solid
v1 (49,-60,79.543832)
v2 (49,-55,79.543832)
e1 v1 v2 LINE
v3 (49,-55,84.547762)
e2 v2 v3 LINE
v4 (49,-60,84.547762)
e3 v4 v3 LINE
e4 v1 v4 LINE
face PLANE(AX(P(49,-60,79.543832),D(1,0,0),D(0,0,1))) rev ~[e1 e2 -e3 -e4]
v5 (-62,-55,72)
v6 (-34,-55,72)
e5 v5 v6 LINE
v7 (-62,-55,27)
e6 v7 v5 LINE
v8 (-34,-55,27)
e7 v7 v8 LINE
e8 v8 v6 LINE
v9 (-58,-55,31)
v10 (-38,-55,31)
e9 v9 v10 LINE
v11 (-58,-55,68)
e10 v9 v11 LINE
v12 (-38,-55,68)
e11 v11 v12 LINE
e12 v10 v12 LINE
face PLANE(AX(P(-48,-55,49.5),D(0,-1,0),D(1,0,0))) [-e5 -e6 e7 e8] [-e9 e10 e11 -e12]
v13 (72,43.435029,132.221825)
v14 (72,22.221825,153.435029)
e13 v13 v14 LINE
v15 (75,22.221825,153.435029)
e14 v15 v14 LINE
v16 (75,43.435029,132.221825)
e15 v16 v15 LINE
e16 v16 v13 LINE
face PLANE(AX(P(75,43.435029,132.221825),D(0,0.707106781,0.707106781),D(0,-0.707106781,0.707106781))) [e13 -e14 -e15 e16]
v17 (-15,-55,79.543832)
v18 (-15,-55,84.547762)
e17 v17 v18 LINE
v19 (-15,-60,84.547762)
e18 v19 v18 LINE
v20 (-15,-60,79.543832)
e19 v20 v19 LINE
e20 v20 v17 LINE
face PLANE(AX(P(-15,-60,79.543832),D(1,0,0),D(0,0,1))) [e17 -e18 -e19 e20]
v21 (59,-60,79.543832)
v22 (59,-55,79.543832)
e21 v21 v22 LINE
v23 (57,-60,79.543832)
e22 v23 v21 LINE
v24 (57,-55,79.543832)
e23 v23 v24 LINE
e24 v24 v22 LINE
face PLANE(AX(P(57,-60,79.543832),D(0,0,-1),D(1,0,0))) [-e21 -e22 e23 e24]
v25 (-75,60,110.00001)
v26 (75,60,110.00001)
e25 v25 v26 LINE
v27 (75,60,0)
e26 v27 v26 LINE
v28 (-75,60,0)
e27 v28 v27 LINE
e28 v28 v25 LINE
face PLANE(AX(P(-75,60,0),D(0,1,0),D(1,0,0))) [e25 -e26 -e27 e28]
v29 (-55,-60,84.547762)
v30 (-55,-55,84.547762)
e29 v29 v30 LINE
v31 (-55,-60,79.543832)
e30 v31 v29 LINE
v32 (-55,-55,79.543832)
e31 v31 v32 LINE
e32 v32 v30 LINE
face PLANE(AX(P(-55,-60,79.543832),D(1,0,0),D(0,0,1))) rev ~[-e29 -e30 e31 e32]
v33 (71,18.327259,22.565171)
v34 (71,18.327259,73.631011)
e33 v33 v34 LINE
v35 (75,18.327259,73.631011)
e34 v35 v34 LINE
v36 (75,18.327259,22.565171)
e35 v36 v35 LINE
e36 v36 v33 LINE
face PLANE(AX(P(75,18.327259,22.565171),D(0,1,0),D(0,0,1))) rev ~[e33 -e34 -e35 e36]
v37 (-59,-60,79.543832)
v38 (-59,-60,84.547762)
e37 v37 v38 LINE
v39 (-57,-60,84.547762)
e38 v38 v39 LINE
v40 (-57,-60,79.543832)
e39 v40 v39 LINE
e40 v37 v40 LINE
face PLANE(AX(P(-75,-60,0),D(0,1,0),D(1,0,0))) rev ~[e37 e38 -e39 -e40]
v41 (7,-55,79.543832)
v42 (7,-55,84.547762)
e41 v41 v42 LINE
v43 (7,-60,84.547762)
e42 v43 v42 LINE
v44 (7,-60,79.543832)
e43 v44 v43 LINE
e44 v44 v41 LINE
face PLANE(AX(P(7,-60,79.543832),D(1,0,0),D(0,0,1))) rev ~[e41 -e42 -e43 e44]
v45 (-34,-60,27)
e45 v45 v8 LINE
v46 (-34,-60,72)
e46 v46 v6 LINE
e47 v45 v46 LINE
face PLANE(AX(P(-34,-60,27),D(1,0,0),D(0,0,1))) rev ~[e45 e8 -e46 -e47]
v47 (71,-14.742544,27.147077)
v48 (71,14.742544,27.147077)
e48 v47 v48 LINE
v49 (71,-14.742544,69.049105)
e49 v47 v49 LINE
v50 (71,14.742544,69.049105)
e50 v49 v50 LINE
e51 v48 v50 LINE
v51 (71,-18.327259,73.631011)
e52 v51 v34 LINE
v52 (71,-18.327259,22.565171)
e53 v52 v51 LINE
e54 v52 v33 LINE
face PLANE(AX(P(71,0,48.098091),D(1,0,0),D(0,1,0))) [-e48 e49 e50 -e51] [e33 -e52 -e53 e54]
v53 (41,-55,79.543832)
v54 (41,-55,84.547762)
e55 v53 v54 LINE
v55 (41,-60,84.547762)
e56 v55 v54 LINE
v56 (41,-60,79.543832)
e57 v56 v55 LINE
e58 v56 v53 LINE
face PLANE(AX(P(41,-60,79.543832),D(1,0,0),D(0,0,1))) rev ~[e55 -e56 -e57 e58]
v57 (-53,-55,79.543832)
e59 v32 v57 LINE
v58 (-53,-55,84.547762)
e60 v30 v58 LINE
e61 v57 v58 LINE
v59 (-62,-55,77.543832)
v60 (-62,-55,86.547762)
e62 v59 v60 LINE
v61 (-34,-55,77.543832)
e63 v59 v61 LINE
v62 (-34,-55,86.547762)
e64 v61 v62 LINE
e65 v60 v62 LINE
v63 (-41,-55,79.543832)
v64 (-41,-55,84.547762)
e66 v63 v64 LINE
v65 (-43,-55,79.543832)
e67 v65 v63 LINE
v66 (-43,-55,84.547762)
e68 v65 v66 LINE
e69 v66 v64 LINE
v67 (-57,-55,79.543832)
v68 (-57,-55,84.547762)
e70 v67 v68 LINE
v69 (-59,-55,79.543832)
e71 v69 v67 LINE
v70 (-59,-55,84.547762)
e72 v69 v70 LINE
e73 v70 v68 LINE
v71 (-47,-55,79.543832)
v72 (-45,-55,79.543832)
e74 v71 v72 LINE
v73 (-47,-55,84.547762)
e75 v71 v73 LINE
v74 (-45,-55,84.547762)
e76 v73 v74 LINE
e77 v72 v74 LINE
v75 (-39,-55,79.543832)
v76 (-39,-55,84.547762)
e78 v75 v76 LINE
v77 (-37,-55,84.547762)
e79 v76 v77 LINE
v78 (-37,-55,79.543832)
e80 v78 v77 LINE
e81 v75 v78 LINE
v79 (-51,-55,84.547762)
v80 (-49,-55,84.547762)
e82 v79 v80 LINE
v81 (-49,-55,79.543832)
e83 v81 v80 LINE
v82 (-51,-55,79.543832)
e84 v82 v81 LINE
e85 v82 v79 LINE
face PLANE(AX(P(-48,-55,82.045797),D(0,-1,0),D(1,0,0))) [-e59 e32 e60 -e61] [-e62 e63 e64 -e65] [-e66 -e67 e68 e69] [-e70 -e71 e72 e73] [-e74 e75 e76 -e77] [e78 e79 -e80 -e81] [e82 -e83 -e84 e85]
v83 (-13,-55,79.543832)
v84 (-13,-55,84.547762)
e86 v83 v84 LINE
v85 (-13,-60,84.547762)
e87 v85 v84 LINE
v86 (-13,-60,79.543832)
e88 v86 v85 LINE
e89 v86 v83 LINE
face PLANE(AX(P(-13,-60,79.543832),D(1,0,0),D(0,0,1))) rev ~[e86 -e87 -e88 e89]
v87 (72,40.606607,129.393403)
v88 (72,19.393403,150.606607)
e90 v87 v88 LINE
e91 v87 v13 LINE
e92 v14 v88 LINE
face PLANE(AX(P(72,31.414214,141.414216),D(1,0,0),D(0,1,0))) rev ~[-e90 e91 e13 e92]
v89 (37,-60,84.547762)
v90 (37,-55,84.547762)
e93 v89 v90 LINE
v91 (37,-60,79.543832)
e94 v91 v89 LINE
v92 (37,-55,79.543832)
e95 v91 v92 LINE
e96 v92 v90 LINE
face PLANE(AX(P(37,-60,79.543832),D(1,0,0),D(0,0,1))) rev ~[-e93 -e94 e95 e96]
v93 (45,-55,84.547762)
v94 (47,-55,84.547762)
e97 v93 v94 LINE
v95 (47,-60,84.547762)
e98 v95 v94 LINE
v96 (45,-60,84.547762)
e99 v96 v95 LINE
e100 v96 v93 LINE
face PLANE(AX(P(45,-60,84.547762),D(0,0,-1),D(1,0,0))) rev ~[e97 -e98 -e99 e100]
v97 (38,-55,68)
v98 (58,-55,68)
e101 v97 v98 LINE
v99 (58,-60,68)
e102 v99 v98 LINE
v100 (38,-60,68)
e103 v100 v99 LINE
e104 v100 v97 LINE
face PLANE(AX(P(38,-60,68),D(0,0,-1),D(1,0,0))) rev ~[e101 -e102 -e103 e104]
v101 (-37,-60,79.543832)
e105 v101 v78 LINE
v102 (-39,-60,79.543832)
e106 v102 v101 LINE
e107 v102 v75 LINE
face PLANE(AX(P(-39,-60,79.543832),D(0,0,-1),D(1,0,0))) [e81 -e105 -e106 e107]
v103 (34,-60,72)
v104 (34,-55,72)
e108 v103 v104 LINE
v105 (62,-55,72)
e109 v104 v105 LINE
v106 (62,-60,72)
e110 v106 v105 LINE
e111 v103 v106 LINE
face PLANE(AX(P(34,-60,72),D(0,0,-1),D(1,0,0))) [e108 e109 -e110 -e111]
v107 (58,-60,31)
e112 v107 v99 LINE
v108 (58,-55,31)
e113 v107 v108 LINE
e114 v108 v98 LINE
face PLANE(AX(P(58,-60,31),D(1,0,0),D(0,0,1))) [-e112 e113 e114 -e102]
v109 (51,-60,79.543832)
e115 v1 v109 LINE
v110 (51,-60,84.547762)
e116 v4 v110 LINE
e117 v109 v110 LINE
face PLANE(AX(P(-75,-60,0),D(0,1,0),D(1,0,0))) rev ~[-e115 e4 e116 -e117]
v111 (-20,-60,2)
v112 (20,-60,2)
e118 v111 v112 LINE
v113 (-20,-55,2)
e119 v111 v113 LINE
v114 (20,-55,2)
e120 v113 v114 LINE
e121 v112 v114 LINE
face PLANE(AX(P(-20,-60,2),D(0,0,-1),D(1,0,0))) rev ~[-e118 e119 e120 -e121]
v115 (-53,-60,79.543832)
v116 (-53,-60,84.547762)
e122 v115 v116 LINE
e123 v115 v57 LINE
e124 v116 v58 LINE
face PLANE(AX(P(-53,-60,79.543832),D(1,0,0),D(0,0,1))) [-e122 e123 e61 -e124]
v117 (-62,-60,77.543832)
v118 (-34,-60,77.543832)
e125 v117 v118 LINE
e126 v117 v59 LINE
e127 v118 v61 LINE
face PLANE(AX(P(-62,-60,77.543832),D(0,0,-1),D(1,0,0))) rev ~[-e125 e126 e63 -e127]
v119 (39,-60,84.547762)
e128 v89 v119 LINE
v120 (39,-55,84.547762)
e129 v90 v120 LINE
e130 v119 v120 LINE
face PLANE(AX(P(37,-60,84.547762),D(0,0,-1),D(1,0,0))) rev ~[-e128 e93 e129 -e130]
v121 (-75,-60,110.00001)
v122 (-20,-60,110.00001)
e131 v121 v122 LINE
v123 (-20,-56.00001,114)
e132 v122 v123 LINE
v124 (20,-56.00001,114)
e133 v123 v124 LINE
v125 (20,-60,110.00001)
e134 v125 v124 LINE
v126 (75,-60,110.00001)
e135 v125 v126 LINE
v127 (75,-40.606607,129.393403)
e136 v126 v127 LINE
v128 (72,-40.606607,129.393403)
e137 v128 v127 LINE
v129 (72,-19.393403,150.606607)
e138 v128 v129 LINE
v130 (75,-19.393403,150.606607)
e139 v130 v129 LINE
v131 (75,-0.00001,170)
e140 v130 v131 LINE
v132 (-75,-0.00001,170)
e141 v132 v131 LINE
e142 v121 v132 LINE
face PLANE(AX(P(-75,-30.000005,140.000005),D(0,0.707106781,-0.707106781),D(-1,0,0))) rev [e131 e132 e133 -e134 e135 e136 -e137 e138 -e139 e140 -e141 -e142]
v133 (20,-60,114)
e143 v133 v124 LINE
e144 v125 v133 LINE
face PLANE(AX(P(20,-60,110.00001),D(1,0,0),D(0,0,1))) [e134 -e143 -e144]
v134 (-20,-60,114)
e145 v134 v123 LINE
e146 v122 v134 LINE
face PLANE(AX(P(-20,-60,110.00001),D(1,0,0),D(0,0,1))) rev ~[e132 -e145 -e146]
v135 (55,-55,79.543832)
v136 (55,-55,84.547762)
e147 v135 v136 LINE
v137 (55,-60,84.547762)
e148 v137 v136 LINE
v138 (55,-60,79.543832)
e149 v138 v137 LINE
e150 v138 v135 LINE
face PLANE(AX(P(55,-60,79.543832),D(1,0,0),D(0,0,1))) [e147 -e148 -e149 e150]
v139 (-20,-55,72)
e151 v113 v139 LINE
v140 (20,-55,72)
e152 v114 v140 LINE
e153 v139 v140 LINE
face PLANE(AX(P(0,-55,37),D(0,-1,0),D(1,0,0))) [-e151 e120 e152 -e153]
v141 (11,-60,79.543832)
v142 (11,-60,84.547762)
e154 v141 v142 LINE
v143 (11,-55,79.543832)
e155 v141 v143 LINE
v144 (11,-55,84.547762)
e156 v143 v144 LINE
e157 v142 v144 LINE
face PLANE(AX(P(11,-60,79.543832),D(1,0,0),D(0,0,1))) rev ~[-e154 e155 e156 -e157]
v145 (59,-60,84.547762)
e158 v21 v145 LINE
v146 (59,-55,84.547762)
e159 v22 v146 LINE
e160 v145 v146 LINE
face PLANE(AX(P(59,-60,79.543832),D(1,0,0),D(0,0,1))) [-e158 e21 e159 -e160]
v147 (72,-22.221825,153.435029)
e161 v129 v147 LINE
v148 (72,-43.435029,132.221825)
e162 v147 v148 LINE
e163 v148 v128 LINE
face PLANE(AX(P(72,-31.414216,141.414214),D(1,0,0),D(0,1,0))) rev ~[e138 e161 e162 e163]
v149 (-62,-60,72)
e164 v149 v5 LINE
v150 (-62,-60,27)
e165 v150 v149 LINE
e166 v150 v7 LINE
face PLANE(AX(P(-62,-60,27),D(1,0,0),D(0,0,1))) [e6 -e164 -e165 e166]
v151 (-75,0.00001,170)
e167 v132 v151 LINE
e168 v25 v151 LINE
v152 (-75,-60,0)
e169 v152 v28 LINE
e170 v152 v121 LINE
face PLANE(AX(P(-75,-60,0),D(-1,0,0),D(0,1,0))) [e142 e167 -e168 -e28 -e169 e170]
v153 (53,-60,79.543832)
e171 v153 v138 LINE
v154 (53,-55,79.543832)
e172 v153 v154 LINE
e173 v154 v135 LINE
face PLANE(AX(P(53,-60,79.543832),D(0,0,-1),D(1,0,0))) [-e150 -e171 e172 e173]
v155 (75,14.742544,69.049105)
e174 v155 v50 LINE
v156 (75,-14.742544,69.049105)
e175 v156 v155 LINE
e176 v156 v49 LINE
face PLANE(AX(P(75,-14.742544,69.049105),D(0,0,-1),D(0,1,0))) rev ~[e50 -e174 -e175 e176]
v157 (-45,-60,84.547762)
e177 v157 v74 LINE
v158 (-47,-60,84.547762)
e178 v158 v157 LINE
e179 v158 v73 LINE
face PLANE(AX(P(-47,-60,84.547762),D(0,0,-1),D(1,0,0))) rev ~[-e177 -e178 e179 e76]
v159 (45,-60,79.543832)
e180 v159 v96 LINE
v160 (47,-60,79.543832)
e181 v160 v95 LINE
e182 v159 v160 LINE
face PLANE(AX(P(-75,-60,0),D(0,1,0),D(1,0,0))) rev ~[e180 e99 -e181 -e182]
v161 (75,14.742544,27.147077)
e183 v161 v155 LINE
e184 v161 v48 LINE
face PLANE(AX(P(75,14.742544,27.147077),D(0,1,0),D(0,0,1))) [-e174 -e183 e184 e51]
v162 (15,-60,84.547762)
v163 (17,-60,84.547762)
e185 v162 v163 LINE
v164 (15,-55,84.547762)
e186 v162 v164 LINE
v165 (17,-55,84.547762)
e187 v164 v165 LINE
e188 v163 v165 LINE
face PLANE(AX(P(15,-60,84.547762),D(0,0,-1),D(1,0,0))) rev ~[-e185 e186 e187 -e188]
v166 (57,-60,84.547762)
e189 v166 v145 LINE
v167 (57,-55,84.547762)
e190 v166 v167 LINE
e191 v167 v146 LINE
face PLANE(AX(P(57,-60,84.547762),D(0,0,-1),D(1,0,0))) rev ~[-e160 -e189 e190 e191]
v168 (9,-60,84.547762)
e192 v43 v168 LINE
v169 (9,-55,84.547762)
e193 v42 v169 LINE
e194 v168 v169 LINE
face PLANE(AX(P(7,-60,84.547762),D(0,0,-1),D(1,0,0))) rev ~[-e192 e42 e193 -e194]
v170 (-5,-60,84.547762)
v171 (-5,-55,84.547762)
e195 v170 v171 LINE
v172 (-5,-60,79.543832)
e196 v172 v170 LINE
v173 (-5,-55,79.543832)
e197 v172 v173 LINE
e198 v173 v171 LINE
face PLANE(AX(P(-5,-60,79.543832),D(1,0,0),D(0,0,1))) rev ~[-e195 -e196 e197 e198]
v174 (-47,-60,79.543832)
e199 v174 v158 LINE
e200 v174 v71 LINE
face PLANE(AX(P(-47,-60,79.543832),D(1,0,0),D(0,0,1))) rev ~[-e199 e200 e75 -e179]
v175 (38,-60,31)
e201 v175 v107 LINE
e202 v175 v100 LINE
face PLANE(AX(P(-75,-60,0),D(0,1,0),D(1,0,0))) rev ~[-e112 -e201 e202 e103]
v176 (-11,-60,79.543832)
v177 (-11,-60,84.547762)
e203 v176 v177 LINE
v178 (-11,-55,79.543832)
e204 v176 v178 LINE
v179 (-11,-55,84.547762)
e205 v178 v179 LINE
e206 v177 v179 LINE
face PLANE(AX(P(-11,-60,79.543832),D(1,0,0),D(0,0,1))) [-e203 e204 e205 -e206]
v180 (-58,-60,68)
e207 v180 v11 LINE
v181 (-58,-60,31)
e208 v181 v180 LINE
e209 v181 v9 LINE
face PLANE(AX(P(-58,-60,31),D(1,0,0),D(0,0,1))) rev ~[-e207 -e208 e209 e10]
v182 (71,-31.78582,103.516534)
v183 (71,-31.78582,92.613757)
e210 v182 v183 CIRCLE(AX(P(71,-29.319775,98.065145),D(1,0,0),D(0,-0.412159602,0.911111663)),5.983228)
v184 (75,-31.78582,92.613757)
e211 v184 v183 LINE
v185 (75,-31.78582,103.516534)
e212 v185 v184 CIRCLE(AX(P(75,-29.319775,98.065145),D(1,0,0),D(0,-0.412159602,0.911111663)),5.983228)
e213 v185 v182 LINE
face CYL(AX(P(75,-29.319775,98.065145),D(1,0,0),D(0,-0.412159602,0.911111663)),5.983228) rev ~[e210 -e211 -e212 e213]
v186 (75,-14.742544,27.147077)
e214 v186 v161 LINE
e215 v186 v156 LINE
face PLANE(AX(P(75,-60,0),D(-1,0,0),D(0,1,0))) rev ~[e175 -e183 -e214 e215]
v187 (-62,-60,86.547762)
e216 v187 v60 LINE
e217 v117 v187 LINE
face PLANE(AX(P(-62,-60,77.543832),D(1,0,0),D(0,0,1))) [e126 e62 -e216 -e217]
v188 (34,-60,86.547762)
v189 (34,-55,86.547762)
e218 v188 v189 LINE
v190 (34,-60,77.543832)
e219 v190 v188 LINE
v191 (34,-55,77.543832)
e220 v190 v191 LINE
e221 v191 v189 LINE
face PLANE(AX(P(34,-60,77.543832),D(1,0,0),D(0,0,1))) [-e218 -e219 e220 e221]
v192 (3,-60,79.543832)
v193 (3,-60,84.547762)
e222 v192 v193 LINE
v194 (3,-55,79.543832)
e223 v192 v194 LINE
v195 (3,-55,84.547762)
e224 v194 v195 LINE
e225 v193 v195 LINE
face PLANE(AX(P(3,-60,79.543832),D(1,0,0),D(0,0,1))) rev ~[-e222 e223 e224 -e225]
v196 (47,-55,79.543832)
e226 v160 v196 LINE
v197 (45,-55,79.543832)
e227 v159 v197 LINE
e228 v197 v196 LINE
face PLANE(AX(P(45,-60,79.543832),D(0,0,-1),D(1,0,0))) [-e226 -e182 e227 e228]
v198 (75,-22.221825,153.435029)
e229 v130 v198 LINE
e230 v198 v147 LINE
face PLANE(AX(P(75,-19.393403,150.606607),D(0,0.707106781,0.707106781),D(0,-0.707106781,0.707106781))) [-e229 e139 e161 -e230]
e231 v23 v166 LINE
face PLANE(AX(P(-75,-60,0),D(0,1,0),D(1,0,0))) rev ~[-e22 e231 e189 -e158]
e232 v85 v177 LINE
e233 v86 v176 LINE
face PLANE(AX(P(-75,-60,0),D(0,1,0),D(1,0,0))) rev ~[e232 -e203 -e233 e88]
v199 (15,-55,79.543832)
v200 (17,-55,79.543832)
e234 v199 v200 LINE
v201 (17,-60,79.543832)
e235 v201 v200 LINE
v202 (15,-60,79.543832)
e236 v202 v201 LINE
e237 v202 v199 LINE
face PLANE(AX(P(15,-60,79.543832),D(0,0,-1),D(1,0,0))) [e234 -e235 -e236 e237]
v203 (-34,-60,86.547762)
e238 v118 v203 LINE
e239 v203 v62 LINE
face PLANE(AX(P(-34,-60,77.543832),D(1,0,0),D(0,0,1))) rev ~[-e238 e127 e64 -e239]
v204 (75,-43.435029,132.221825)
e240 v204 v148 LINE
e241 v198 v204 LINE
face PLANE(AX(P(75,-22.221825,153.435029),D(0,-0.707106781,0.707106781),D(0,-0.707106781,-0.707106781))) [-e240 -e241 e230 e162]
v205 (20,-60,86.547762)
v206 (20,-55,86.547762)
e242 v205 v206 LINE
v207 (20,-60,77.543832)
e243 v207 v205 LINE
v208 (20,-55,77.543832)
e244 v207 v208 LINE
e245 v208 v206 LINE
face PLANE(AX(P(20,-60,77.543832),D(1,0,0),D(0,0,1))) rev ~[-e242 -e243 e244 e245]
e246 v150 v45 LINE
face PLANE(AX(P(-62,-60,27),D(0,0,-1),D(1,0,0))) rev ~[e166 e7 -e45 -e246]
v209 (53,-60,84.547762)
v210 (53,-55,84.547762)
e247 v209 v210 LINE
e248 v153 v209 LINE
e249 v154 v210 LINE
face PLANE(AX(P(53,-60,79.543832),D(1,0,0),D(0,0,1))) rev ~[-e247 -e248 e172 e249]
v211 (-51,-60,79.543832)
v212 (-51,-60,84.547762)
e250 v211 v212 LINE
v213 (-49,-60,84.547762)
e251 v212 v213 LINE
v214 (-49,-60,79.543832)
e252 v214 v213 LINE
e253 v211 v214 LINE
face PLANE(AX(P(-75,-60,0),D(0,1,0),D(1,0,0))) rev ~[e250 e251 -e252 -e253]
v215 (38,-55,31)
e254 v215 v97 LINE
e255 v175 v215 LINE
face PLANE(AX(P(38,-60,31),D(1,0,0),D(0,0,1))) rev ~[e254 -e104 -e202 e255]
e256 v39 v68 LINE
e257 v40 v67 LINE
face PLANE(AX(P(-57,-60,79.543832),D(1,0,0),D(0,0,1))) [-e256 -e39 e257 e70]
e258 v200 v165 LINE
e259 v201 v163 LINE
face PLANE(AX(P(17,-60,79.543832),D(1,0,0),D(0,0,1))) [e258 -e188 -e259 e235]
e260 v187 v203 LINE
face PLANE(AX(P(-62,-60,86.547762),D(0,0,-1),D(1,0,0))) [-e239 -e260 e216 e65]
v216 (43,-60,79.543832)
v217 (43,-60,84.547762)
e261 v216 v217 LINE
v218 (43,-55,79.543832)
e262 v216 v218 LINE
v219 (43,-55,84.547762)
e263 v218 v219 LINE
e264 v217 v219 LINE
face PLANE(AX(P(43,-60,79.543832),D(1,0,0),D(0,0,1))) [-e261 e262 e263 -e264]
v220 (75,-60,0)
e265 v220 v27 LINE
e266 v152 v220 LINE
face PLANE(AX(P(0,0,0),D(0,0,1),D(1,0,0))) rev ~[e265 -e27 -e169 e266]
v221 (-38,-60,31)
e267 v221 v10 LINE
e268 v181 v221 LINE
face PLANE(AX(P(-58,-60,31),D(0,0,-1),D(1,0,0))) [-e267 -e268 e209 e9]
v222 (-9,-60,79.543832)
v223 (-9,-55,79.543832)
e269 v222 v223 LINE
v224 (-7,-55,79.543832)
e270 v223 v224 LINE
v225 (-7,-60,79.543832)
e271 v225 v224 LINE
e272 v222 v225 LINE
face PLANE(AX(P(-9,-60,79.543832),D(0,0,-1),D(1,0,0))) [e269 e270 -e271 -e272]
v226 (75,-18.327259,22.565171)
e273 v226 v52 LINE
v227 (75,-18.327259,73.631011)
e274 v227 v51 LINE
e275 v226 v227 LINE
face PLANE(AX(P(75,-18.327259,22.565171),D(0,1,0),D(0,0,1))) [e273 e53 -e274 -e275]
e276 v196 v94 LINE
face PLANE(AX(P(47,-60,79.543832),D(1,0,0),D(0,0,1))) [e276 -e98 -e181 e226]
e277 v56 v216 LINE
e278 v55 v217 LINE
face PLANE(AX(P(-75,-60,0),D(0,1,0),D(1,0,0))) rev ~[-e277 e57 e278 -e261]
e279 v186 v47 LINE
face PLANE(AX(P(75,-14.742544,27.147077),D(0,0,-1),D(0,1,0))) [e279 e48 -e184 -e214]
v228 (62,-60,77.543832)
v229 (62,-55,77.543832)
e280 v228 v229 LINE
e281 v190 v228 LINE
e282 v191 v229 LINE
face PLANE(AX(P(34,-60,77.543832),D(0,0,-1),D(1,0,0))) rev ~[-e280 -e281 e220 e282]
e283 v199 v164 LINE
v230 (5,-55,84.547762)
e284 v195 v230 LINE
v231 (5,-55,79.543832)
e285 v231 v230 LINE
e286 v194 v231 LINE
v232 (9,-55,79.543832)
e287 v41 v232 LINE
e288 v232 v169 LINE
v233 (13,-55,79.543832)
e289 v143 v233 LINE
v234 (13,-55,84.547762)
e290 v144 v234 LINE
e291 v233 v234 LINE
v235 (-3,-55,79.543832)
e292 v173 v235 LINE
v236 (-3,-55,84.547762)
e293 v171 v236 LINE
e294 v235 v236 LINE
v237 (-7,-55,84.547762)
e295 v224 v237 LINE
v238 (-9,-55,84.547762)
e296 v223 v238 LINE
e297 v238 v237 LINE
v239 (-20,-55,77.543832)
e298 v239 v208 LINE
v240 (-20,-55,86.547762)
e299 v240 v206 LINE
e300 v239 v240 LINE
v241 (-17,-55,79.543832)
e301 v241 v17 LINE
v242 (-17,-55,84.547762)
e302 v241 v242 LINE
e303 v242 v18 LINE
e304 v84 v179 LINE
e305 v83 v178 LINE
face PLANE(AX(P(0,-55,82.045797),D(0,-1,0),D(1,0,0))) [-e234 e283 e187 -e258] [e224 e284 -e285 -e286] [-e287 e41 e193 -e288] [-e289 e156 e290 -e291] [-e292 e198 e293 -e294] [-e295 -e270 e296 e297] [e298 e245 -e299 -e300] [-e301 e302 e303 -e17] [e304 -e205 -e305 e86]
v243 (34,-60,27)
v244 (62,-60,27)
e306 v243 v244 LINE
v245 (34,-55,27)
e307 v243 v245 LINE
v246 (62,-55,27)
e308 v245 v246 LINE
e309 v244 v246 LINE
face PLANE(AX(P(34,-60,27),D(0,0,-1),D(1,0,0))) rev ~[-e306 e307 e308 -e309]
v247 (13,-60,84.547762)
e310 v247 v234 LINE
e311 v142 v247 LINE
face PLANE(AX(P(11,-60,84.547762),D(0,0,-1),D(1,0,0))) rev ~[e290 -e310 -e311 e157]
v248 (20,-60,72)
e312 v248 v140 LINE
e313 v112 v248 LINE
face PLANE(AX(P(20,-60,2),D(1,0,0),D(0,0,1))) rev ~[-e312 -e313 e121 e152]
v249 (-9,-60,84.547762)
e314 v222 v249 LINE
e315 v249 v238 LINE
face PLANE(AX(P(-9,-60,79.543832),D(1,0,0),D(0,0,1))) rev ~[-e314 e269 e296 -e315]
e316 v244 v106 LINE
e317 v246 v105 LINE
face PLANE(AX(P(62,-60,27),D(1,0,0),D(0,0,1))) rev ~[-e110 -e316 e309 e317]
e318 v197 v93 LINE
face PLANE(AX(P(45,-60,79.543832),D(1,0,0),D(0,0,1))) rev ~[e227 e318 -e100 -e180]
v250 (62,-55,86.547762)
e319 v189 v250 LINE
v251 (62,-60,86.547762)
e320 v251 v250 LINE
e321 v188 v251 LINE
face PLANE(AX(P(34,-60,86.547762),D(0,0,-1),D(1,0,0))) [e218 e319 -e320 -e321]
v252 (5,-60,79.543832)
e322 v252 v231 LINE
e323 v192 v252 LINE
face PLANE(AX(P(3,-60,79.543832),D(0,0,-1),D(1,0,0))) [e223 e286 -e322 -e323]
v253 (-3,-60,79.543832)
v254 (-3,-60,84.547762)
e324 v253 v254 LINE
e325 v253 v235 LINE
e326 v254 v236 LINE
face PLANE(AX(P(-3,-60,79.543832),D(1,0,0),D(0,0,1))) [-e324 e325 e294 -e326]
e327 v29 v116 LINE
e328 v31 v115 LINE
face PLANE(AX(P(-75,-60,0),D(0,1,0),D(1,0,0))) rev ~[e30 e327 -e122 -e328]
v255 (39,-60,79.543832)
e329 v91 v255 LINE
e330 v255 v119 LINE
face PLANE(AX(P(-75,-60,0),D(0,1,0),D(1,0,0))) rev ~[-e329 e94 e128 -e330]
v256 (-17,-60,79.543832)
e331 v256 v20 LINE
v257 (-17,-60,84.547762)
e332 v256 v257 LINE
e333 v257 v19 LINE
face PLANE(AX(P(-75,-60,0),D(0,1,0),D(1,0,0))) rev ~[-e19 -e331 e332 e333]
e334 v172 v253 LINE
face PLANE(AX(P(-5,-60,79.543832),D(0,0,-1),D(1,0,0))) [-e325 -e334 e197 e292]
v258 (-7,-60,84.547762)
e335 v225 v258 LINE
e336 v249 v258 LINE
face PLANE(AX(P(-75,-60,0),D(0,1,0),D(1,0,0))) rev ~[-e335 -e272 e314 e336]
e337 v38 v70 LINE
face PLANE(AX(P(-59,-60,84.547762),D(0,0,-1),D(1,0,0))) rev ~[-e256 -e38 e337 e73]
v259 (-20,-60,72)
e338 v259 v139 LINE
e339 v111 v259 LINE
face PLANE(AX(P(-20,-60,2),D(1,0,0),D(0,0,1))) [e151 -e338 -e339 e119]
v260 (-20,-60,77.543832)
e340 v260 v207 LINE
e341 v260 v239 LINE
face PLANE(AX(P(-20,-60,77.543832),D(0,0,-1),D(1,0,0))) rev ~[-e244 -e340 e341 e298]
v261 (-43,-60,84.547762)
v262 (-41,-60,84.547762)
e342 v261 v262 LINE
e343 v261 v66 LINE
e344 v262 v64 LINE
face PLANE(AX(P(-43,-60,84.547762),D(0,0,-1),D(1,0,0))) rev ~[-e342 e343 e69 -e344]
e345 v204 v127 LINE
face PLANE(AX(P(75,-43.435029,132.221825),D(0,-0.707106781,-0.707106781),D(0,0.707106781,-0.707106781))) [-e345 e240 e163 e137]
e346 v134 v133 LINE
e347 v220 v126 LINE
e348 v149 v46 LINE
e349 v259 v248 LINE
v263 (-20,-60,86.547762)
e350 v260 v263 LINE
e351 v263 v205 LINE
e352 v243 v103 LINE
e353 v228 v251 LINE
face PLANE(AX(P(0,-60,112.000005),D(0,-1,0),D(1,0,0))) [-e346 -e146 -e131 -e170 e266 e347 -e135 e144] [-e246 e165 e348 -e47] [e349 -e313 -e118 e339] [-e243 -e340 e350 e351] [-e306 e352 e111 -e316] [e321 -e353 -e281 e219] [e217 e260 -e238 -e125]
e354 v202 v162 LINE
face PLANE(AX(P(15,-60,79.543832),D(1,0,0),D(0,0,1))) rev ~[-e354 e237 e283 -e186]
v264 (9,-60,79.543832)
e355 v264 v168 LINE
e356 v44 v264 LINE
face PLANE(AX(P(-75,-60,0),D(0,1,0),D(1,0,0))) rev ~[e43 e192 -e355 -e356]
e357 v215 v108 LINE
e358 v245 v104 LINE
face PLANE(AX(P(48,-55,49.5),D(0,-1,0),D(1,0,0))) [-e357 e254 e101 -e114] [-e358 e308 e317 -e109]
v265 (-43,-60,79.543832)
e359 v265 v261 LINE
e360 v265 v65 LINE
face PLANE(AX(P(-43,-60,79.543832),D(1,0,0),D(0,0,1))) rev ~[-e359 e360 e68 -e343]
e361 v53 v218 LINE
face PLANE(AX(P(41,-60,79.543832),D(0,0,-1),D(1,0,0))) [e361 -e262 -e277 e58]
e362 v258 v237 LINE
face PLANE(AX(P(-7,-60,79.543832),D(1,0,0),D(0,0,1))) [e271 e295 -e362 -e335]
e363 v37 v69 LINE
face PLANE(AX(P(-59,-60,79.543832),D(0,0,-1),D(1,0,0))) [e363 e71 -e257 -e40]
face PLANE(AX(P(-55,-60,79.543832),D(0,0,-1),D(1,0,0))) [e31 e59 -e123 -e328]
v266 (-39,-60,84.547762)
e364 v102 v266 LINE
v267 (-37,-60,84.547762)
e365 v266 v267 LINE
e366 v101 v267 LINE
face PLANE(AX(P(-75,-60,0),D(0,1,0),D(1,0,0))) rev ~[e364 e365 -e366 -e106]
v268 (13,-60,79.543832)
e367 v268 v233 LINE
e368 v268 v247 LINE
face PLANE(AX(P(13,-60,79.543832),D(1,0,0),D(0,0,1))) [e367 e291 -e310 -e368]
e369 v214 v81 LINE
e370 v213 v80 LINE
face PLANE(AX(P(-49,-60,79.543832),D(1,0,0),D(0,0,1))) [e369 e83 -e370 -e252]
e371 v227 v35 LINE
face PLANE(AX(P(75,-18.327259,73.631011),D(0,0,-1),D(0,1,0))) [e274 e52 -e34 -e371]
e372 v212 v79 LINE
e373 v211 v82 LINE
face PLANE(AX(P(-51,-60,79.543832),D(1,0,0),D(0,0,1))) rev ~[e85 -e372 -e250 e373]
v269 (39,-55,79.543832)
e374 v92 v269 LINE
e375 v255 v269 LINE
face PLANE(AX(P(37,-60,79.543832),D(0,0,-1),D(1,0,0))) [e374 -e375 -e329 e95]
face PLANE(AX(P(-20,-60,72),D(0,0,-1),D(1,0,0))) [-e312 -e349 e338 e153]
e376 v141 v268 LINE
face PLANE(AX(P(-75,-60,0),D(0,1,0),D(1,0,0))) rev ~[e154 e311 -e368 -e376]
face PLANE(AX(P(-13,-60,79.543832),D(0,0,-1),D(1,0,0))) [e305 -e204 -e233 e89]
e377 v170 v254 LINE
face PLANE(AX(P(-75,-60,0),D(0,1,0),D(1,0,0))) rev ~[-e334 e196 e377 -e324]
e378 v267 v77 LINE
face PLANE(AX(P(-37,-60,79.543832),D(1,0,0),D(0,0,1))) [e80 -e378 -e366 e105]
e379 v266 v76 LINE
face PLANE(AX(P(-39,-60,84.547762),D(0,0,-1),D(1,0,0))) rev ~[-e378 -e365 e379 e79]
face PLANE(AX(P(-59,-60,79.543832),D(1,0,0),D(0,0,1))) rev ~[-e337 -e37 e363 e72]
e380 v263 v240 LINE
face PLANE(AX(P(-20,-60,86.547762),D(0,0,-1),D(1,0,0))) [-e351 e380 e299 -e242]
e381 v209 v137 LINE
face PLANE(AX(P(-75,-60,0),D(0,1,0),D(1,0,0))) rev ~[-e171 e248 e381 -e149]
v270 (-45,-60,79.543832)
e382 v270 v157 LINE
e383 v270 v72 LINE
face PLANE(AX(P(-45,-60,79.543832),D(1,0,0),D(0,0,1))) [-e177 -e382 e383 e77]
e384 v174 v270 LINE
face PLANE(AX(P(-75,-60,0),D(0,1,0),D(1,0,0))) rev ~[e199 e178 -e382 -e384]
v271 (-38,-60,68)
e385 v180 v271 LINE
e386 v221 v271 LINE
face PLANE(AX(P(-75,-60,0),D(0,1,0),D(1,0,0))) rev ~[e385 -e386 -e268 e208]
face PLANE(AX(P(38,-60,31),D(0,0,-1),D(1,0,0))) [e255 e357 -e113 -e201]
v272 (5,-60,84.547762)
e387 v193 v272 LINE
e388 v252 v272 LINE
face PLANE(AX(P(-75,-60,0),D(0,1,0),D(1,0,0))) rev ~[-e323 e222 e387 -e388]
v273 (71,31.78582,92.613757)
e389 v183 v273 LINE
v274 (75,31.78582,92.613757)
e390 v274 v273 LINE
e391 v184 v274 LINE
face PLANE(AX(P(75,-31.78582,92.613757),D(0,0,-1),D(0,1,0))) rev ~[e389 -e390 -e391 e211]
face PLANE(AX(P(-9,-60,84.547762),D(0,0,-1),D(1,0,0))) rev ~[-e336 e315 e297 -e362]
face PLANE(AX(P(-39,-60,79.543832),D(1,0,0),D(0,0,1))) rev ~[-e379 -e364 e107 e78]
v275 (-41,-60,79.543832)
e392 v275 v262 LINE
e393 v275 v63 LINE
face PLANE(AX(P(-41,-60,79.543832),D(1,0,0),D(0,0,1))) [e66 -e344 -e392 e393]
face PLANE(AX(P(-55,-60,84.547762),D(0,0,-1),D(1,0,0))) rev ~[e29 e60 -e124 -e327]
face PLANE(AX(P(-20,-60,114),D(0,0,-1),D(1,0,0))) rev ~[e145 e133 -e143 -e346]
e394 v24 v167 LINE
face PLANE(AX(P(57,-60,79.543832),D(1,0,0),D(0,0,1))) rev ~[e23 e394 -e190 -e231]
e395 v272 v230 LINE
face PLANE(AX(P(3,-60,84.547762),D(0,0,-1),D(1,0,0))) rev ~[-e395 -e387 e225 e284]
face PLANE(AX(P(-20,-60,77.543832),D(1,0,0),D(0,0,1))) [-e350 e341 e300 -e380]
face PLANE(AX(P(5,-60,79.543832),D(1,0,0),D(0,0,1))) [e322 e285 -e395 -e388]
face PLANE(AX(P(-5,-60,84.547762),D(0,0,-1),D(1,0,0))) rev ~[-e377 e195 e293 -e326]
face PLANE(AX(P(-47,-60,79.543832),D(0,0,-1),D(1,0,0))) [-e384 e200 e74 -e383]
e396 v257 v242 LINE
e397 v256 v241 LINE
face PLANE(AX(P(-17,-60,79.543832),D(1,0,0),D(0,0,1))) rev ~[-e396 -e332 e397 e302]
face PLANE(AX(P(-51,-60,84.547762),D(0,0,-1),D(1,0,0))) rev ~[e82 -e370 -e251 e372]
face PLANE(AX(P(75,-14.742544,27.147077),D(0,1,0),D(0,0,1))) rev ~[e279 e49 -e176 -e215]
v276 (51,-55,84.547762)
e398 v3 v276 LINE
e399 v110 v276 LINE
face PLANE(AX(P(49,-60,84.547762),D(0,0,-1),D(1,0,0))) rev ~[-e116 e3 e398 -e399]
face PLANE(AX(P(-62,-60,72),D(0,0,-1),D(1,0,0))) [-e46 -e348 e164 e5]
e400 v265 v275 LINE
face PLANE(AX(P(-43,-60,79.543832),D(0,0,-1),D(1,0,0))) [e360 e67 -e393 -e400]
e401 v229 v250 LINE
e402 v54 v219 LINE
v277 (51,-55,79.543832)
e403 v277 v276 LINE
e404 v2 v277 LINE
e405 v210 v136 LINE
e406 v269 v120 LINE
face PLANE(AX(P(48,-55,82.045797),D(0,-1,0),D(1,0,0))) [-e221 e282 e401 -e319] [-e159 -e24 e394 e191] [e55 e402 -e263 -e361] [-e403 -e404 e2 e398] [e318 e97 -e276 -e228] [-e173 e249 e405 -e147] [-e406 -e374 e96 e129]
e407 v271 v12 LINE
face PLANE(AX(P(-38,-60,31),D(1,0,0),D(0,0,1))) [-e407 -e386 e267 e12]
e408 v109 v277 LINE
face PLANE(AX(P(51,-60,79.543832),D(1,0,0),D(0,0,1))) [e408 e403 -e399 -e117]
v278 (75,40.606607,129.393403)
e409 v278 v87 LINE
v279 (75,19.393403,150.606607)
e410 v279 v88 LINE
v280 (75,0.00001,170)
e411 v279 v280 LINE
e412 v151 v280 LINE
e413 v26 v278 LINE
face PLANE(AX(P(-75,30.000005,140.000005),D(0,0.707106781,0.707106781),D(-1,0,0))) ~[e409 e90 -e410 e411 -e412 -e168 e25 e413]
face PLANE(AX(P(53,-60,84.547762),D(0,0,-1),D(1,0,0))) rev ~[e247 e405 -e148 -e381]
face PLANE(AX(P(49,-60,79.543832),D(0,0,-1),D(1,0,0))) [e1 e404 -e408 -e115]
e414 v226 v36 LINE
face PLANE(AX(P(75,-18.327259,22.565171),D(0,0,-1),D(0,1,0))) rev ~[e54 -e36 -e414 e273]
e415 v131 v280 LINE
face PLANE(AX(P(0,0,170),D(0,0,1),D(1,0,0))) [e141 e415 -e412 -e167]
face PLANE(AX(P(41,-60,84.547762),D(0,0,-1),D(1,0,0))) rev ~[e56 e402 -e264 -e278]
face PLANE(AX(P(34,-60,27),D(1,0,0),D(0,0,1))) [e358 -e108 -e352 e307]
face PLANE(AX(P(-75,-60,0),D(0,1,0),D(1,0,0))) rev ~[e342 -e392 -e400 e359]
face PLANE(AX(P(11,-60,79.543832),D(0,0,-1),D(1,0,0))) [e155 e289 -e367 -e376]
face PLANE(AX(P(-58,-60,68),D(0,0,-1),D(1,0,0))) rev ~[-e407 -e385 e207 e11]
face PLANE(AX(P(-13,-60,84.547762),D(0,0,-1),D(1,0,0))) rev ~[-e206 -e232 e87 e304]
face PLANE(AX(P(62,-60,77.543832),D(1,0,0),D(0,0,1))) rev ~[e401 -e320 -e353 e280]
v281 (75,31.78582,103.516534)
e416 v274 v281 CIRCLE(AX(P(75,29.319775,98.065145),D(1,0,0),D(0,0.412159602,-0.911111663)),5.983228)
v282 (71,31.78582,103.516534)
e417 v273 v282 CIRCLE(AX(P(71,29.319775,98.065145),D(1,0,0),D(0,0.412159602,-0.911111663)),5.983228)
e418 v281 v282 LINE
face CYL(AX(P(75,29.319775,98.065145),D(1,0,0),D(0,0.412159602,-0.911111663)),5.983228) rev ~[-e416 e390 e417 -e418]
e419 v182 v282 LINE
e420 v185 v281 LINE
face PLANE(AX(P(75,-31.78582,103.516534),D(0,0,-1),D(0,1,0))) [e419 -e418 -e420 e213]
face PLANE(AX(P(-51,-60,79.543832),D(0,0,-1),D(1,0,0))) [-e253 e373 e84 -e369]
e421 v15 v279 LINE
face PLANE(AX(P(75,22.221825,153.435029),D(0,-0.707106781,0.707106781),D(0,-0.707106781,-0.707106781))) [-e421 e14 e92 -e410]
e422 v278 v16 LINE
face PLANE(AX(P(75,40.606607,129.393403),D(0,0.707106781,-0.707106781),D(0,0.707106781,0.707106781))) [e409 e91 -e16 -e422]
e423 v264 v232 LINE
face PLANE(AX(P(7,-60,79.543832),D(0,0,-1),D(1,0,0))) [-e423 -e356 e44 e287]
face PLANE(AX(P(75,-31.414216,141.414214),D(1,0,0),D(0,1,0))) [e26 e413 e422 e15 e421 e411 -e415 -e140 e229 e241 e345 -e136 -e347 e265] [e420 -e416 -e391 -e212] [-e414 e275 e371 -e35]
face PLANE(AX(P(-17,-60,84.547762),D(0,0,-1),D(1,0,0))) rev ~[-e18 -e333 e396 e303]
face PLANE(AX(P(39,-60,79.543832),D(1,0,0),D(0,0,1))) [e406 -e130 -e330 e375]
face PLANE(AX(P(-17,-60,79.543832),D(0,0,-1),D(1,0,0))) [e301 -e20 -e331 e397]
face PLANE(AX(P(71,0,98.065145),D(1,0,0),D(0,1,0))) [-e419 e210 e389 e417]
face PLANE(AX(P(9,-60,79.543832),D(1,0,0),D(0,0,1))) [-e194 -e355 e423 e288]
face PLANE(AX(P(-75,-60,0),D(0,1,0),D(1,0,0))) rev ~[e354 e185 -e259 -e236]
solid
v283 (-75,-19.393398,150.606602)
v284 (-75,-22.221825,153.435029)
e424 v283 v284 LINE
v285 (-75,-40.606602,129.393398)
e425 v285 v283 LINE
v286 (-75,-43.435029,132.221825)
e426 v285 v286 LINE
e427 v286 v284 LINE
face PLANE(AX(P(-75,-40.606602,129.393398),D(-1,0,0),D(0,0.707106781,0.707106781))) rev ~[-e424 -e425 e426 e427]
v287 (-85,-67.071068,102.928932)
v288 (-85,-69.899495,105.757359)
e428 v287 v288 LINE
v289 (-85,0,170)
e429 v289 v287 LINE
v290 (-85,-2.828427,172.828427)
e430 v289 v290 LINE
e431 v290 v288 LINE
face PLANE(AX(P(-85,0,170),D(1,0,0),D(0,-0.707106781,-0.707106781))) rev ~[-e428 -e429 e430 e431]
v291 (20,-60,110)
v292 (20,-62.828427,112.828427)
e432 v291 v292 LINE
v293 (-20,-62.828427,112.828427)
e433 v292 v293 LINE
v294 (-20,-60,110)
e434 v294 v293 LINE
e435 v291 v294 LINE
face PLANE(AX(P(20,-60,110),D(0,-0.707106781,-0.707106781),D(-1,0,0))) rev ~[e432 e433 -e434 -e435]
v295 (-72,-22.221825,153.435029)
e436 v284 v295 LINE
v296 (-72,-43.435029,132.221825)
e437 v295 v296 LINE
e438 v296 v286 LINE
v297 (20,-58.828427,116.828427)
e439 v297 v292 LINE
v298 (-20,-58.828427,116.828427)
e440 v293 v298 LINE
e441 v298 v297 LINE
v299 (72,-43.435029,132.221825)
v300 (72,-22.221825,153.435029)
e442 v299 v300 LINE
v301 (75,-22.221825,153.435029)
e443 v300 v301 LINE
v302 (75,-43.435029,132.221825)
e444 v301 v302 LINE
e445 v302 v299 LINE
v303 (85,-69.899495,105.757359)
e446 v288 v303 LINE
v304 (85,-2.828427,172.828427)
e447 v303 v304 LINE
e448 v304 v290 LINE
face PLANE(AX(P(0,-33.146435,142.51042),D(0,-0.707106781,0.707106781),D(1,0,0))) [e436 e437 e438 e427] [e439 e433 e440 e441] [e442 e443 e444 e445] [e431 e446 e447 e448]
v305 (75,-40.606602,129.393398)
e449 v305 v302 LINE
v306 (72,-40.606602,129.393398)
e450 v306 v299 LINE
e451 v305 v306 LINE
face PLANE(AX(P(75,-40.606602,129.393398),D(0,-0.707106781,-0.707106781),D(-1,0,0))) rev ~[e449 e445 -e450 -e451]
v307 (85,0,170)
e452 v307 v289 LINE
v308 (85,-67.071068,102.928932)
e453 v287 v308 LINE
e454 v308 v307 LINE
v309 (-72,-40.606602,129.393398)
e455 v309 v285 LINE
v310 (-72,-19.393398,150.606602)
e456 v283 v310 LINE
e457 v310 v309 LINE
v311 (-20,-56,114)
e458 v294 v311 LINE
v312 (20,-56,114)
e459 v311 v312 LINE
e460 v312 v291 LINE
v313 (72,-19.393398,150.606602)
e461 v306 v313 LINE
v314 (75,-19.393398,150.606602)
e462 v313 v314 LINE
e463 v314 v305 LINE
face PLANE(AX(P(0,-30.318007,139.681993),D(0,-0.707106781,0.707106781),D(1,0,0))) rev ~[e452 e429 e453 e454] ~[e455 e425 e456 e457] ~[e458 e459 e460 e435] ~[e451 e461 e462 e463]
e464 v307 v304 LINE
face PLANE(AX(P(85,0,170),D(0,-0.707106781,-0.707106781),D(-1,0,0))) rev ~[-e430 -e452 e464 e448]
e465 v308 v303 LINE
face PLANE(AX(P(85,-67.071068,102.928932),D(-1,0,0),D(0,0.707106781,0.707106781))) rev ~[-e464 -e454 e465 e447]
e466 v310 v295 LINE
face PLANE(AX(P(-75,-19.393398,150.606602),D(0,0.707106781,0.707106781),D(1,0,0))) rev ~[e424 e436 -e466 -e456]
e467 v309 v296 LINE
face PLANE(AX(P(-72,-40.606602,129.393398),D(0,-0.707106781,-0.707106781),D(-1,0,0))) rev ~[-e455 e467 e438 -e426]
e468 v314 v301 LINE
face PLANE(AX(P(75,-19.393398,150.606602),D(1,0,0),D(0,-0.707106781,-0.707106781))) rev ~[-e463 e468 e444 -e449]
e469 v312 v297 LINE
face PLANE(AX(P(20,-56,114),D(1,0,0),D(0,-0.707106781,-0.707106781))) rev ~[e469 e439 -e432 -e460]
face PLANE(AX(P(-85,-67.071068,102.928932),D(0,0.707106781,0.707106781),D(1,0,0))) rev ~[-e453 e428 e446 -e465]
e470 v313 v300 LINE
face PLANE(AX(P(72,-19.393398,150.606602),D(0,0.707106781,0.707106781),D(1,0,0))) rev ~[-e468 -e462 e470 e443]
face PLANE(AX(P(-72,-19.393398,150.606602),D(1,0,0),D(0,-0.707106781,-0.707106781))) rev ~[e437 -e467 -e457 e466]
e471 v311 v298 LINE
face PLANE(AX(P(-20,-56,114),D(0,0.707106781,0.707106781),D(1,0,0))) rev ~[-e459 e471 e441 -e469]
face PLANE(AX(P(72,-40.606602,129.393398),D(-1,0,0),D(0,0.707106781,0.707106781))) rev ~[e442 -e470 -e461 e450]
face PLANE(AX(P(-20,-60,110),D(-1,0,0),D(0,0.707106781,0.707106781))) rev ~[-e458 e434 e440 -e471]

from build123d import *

# Parameters (mm, degrees)
F0_W      = 150
F0_H      = 120
F1_DEPTH  = 170
F2_SIZE   = 59.99999
F3_W      = 28
F3_H      = 9.0039297938
F3_W_2    = 2
F3_H_2    = 5.0039297938
F3_H_3    = 45
F3_W_3    = 20
F3_H_4    = 37
F3_W_4    = 40
F3_H_5    = 70
F4_DEPTH  = 5
F3_H_6    = 3.99999
F5_DEPTH  = 4
F6_W      = 36.6545170546
F6_H      = 51.0658398271
F6_W_2    = 29.4850878417
F6_H_2    = 41.9020280242
F6_W_3    = 63.571639359
F6_H_3    = 10.9027773142
F7_DEPTH  = 4
F8_DEPTH  = 3
F10_DEPTH = 4


# Not quite as in the source:
# - a fillet or chamfer is up to 0.001 mm smaller than in the source, because OpenCascade refuses the exact size
# - ends of sketch curves that miss each other by under 0.0002 mm in the source are joined
# - a feature names something its author has since deleted; it is built from what else it names


with BuildPart() as f1:
    # F0 (on Top) → F1 (new body)
    with BuildSketch(Plane.XY):
        Rectangle(F0_W, F0_H)
    extrude(amount=F1_DEPTH)

    # F2 (size 60 in the source; OpenCascade refuses exactly that, so slightly less here)
    f2_edges = [f1.edges().sort_by_distance(p)[0] for p in [
        (0, -60, 170),
        (0, 60, 170),
    ]]
    chamfer(f2_edges, length=F2_SIZE)

    # F3 (on face) → F4 (cut)
    with BuildSketch(Plane.XZ.offset(60)):
        with Locations((-48, 82.0457972586)):
            Rectangle(F3_W, F3_H)
        with Locations((-58, 82.0457972586)):
            Rectangle(F3_W_2, F3_H_2, mode=Mode.SUBTRACT)
        with Locations((-54, 82.0457972586)):
            Rectangle(F3_W_2, F3_H_2, mode=Mode.SUBTRACT)
        with Locations((-50, 82.0457972586)):
            Rectangle(F3_W_2, F3_H_2, mode=Mode.SUBTRACT)
        with Locations((-46, 82.0457972586)):
            Rectangle(F3_W_2, F3_H_2, mode=Mode.SUBTRACT)
        with Locations((-42, 82.0457972586)):
            Rectangle(F3_W_2, F3_H_2, mode=Mode.SUBTRACT)
        with Locations((-38, 82.0457972586)):
            Rectangle(F3_W_2, F3_H_2, mode=Mode.SUBTRACT)
        with Locations((-48, 49.5)):
            Rectangle(F3_W, F3_H_3)
        with Locations((-48, 49.5)):
            Rectangle(F3_W_3, F3_H_4, mode=Mode.SUBTRACT)
        with Locations((0, 37)):
            Rectangle(F3_W_4, F3_H_5)
        with Locations((0, 82.0457972586)):
            Rectangle(F3_W_4, F3_H)
        with Locations((-16, 82.0457972586)):
            Rectangle(F3_W_2, F3_H_2, mode=Mode.SUBTRACT)
        with Locations((-12, 82.0457972586)):
            Rectangle(F3_W_2, F3_H_2, mode=Mode.SUBTRACT)
        with Locations((-8, 82.0457972586)):
            Rectangle(F3_W_2, F3_H_2, mode=Mode.SUBTRACT)
        with Locations((-4, 82.0457972586)):
            Rectangle(F3_W_2, F3_H_2, mode=Mode.SUBTRACT)
        with Locations((4, 82.0457972586)):
            Rectangle(F3_W_2, F3_H_2, mode=Mode.SUBTRACT)
        with Locations((8, 82.0457972586)):
            Rectangle(F3_W_2, F3_H_2, mode=Mode.SUBTRACT)
        with Locations((12, 82.0457972586)):
            Rectangle(F3_W_2, F3_H_2, mode=Mode.SUBTRACT)
        with Locations((16, 82.0457972586)):
            Rectangle(F3_W_2, F3_H_2, mode=Mode.SUBTRACT)
        with Locations((48, 82.0457972586)):
            Rectangle(F3_W, F3_H)
        with Locations((38, 82.0457972586)):
            Rectangle(F3_W_2, F3_H_2, mode=Mode.SUBTRACT)
        with Locations((42, 82.0457972586)):
            Rectangle(F3_W_2, F3_H_2, mode=Mode.SUBTRACT)
        with Locations((46, 82.0457972586)):
            Rectangle(F3_W_2, F3_H_2, mode=Mode.SUBTRACT)
        with Locations((50, 82.0457972586)):
            Rectangle(F3_W_2, F3_H_2, mode=Mode.SUBTRACT)
        with Locations((54, 82.0457972586)):
            Rectangle(F3_W_2, F3_H_2, mode=Mode.SUBTRACT)
        with Locations((58, 82.0457972586)):
            Rectangle(F3_W_2, F3_H_2, mode=Mode.SUBTRACT)
        with Locations((48, 49.5)):
            Rectangle(F3_W, F3_H_3)
        with Locations((48, 49.5)):
            Rectangle(F3_W_3, F3_H_4, mode=Mode.SUBTRACT)
    extrude(amount=-F4_DEPTH, mode=Mode.SUBTRACT)

    # F3 (on face) → F5 (join)
    with BuildSketch(Plane.XZ.offset(60)):
        with Locations((0, 112.000005)):
            Rectangle(F3_W_4, F3_H_6)
    extrude(amount=-F5_DEPTH)

    # F6 (on face) → F7 (cut)
    with BuildSketch(Plane.YZ.offset(75)):
        with Locations((0, 48.0980910361)):
            Rectangle(F6_W, F6_H)
        with Locations((0, 48.0980910361)):
            Rectangle(F6_W_2, F6_H_2, mode=Mode.SUBTRACT)
        with Locations((0, 98.0651453137)):
            Rectangle(F6_W_3, F6_H_3)
        with BuildLine():
            Line((-31.7858196795, 92.6137566566), (-31.7858196795, 103.5165339708))
            ThreePointArc((-31.7858196795, 103.5165339708), (-35.3030027089, 98.0651453137), (-31.7858196795, 92.6137566566))
        make_face()
        with BuildLine():
            ThreePointArc((31.7858196795, 92.6137566566), (35.3030027089, 98.0651453137), (31.7858196795, 103.5165339708))
            Line((31.7858196795, 103.5165339708), (31.7858196795, 92.6137566566))
        make_face()
    extrude(amount=-F7_DEPTH, mode=Mode.SUBTRACT)

    # F6 (on face) → F8 (join)
    with BuildSketch(Plane.YZ.offset(75)):
        Polygon((-43.4350288425, 132.2218254069), (-40.6066017178, 129.3933982822), (-19.3934032822, 150.6066067178), (-22.2218254069, 153.4350288425), align=None)
        Polygon((22.2218254069, 153.4350288425), (19.3933982822, 150.6066017178), (40.6066067178, 129.3934032822), (43.4350288425, 132.2218254069), align=None)
    extrude(amount=-F8_DEPTH)


with BuildPart() as f10:
    # F9 (on face) → F10 (new body)
    with BuildSketch(Plane(origin=(0, -85, 85), x_dir=(1, 0, 0), z_dir=(0, -0.7071067812, 0.7071067812))):
        Polygon((75, 35.3553390593), (75, 62.7817459305), (72, 62.7817459305), (72, 92.7817459305), (75, 92.7817459305), (75, 120.2081528017), (-75, 120.2081528017), (-75, 92.7817459305), (-72, 92.7817459305), (-72, 62.7817459305), (-75, 62.7817459305), (-75, 35.3553390593), (-20, 35.3553390593), (-20, 41.0121933088), (20, 41.0121933088), (20, 35.3553390593), align=None)
        Polygon((75, 92.7817459305), (75, 62.7817459305), (75, 35.3553390593), (20, 35.3553390593), (-20, 35.3553390593), (-75, 35.3553390593), (-75, 62.7817459305), (-75, 92.7817459305), (-75, 120.2081528017), (-85, 120.2081528017), (-85, 25.3553390593), (0, 25.3553390593), (85, 25.3553390593), (85, 120.2081528017), (75, 120.2081528017), align=None)
    extrude(amount=F10_DEPTH)


solid = Compound([f1.part, f10.part])
